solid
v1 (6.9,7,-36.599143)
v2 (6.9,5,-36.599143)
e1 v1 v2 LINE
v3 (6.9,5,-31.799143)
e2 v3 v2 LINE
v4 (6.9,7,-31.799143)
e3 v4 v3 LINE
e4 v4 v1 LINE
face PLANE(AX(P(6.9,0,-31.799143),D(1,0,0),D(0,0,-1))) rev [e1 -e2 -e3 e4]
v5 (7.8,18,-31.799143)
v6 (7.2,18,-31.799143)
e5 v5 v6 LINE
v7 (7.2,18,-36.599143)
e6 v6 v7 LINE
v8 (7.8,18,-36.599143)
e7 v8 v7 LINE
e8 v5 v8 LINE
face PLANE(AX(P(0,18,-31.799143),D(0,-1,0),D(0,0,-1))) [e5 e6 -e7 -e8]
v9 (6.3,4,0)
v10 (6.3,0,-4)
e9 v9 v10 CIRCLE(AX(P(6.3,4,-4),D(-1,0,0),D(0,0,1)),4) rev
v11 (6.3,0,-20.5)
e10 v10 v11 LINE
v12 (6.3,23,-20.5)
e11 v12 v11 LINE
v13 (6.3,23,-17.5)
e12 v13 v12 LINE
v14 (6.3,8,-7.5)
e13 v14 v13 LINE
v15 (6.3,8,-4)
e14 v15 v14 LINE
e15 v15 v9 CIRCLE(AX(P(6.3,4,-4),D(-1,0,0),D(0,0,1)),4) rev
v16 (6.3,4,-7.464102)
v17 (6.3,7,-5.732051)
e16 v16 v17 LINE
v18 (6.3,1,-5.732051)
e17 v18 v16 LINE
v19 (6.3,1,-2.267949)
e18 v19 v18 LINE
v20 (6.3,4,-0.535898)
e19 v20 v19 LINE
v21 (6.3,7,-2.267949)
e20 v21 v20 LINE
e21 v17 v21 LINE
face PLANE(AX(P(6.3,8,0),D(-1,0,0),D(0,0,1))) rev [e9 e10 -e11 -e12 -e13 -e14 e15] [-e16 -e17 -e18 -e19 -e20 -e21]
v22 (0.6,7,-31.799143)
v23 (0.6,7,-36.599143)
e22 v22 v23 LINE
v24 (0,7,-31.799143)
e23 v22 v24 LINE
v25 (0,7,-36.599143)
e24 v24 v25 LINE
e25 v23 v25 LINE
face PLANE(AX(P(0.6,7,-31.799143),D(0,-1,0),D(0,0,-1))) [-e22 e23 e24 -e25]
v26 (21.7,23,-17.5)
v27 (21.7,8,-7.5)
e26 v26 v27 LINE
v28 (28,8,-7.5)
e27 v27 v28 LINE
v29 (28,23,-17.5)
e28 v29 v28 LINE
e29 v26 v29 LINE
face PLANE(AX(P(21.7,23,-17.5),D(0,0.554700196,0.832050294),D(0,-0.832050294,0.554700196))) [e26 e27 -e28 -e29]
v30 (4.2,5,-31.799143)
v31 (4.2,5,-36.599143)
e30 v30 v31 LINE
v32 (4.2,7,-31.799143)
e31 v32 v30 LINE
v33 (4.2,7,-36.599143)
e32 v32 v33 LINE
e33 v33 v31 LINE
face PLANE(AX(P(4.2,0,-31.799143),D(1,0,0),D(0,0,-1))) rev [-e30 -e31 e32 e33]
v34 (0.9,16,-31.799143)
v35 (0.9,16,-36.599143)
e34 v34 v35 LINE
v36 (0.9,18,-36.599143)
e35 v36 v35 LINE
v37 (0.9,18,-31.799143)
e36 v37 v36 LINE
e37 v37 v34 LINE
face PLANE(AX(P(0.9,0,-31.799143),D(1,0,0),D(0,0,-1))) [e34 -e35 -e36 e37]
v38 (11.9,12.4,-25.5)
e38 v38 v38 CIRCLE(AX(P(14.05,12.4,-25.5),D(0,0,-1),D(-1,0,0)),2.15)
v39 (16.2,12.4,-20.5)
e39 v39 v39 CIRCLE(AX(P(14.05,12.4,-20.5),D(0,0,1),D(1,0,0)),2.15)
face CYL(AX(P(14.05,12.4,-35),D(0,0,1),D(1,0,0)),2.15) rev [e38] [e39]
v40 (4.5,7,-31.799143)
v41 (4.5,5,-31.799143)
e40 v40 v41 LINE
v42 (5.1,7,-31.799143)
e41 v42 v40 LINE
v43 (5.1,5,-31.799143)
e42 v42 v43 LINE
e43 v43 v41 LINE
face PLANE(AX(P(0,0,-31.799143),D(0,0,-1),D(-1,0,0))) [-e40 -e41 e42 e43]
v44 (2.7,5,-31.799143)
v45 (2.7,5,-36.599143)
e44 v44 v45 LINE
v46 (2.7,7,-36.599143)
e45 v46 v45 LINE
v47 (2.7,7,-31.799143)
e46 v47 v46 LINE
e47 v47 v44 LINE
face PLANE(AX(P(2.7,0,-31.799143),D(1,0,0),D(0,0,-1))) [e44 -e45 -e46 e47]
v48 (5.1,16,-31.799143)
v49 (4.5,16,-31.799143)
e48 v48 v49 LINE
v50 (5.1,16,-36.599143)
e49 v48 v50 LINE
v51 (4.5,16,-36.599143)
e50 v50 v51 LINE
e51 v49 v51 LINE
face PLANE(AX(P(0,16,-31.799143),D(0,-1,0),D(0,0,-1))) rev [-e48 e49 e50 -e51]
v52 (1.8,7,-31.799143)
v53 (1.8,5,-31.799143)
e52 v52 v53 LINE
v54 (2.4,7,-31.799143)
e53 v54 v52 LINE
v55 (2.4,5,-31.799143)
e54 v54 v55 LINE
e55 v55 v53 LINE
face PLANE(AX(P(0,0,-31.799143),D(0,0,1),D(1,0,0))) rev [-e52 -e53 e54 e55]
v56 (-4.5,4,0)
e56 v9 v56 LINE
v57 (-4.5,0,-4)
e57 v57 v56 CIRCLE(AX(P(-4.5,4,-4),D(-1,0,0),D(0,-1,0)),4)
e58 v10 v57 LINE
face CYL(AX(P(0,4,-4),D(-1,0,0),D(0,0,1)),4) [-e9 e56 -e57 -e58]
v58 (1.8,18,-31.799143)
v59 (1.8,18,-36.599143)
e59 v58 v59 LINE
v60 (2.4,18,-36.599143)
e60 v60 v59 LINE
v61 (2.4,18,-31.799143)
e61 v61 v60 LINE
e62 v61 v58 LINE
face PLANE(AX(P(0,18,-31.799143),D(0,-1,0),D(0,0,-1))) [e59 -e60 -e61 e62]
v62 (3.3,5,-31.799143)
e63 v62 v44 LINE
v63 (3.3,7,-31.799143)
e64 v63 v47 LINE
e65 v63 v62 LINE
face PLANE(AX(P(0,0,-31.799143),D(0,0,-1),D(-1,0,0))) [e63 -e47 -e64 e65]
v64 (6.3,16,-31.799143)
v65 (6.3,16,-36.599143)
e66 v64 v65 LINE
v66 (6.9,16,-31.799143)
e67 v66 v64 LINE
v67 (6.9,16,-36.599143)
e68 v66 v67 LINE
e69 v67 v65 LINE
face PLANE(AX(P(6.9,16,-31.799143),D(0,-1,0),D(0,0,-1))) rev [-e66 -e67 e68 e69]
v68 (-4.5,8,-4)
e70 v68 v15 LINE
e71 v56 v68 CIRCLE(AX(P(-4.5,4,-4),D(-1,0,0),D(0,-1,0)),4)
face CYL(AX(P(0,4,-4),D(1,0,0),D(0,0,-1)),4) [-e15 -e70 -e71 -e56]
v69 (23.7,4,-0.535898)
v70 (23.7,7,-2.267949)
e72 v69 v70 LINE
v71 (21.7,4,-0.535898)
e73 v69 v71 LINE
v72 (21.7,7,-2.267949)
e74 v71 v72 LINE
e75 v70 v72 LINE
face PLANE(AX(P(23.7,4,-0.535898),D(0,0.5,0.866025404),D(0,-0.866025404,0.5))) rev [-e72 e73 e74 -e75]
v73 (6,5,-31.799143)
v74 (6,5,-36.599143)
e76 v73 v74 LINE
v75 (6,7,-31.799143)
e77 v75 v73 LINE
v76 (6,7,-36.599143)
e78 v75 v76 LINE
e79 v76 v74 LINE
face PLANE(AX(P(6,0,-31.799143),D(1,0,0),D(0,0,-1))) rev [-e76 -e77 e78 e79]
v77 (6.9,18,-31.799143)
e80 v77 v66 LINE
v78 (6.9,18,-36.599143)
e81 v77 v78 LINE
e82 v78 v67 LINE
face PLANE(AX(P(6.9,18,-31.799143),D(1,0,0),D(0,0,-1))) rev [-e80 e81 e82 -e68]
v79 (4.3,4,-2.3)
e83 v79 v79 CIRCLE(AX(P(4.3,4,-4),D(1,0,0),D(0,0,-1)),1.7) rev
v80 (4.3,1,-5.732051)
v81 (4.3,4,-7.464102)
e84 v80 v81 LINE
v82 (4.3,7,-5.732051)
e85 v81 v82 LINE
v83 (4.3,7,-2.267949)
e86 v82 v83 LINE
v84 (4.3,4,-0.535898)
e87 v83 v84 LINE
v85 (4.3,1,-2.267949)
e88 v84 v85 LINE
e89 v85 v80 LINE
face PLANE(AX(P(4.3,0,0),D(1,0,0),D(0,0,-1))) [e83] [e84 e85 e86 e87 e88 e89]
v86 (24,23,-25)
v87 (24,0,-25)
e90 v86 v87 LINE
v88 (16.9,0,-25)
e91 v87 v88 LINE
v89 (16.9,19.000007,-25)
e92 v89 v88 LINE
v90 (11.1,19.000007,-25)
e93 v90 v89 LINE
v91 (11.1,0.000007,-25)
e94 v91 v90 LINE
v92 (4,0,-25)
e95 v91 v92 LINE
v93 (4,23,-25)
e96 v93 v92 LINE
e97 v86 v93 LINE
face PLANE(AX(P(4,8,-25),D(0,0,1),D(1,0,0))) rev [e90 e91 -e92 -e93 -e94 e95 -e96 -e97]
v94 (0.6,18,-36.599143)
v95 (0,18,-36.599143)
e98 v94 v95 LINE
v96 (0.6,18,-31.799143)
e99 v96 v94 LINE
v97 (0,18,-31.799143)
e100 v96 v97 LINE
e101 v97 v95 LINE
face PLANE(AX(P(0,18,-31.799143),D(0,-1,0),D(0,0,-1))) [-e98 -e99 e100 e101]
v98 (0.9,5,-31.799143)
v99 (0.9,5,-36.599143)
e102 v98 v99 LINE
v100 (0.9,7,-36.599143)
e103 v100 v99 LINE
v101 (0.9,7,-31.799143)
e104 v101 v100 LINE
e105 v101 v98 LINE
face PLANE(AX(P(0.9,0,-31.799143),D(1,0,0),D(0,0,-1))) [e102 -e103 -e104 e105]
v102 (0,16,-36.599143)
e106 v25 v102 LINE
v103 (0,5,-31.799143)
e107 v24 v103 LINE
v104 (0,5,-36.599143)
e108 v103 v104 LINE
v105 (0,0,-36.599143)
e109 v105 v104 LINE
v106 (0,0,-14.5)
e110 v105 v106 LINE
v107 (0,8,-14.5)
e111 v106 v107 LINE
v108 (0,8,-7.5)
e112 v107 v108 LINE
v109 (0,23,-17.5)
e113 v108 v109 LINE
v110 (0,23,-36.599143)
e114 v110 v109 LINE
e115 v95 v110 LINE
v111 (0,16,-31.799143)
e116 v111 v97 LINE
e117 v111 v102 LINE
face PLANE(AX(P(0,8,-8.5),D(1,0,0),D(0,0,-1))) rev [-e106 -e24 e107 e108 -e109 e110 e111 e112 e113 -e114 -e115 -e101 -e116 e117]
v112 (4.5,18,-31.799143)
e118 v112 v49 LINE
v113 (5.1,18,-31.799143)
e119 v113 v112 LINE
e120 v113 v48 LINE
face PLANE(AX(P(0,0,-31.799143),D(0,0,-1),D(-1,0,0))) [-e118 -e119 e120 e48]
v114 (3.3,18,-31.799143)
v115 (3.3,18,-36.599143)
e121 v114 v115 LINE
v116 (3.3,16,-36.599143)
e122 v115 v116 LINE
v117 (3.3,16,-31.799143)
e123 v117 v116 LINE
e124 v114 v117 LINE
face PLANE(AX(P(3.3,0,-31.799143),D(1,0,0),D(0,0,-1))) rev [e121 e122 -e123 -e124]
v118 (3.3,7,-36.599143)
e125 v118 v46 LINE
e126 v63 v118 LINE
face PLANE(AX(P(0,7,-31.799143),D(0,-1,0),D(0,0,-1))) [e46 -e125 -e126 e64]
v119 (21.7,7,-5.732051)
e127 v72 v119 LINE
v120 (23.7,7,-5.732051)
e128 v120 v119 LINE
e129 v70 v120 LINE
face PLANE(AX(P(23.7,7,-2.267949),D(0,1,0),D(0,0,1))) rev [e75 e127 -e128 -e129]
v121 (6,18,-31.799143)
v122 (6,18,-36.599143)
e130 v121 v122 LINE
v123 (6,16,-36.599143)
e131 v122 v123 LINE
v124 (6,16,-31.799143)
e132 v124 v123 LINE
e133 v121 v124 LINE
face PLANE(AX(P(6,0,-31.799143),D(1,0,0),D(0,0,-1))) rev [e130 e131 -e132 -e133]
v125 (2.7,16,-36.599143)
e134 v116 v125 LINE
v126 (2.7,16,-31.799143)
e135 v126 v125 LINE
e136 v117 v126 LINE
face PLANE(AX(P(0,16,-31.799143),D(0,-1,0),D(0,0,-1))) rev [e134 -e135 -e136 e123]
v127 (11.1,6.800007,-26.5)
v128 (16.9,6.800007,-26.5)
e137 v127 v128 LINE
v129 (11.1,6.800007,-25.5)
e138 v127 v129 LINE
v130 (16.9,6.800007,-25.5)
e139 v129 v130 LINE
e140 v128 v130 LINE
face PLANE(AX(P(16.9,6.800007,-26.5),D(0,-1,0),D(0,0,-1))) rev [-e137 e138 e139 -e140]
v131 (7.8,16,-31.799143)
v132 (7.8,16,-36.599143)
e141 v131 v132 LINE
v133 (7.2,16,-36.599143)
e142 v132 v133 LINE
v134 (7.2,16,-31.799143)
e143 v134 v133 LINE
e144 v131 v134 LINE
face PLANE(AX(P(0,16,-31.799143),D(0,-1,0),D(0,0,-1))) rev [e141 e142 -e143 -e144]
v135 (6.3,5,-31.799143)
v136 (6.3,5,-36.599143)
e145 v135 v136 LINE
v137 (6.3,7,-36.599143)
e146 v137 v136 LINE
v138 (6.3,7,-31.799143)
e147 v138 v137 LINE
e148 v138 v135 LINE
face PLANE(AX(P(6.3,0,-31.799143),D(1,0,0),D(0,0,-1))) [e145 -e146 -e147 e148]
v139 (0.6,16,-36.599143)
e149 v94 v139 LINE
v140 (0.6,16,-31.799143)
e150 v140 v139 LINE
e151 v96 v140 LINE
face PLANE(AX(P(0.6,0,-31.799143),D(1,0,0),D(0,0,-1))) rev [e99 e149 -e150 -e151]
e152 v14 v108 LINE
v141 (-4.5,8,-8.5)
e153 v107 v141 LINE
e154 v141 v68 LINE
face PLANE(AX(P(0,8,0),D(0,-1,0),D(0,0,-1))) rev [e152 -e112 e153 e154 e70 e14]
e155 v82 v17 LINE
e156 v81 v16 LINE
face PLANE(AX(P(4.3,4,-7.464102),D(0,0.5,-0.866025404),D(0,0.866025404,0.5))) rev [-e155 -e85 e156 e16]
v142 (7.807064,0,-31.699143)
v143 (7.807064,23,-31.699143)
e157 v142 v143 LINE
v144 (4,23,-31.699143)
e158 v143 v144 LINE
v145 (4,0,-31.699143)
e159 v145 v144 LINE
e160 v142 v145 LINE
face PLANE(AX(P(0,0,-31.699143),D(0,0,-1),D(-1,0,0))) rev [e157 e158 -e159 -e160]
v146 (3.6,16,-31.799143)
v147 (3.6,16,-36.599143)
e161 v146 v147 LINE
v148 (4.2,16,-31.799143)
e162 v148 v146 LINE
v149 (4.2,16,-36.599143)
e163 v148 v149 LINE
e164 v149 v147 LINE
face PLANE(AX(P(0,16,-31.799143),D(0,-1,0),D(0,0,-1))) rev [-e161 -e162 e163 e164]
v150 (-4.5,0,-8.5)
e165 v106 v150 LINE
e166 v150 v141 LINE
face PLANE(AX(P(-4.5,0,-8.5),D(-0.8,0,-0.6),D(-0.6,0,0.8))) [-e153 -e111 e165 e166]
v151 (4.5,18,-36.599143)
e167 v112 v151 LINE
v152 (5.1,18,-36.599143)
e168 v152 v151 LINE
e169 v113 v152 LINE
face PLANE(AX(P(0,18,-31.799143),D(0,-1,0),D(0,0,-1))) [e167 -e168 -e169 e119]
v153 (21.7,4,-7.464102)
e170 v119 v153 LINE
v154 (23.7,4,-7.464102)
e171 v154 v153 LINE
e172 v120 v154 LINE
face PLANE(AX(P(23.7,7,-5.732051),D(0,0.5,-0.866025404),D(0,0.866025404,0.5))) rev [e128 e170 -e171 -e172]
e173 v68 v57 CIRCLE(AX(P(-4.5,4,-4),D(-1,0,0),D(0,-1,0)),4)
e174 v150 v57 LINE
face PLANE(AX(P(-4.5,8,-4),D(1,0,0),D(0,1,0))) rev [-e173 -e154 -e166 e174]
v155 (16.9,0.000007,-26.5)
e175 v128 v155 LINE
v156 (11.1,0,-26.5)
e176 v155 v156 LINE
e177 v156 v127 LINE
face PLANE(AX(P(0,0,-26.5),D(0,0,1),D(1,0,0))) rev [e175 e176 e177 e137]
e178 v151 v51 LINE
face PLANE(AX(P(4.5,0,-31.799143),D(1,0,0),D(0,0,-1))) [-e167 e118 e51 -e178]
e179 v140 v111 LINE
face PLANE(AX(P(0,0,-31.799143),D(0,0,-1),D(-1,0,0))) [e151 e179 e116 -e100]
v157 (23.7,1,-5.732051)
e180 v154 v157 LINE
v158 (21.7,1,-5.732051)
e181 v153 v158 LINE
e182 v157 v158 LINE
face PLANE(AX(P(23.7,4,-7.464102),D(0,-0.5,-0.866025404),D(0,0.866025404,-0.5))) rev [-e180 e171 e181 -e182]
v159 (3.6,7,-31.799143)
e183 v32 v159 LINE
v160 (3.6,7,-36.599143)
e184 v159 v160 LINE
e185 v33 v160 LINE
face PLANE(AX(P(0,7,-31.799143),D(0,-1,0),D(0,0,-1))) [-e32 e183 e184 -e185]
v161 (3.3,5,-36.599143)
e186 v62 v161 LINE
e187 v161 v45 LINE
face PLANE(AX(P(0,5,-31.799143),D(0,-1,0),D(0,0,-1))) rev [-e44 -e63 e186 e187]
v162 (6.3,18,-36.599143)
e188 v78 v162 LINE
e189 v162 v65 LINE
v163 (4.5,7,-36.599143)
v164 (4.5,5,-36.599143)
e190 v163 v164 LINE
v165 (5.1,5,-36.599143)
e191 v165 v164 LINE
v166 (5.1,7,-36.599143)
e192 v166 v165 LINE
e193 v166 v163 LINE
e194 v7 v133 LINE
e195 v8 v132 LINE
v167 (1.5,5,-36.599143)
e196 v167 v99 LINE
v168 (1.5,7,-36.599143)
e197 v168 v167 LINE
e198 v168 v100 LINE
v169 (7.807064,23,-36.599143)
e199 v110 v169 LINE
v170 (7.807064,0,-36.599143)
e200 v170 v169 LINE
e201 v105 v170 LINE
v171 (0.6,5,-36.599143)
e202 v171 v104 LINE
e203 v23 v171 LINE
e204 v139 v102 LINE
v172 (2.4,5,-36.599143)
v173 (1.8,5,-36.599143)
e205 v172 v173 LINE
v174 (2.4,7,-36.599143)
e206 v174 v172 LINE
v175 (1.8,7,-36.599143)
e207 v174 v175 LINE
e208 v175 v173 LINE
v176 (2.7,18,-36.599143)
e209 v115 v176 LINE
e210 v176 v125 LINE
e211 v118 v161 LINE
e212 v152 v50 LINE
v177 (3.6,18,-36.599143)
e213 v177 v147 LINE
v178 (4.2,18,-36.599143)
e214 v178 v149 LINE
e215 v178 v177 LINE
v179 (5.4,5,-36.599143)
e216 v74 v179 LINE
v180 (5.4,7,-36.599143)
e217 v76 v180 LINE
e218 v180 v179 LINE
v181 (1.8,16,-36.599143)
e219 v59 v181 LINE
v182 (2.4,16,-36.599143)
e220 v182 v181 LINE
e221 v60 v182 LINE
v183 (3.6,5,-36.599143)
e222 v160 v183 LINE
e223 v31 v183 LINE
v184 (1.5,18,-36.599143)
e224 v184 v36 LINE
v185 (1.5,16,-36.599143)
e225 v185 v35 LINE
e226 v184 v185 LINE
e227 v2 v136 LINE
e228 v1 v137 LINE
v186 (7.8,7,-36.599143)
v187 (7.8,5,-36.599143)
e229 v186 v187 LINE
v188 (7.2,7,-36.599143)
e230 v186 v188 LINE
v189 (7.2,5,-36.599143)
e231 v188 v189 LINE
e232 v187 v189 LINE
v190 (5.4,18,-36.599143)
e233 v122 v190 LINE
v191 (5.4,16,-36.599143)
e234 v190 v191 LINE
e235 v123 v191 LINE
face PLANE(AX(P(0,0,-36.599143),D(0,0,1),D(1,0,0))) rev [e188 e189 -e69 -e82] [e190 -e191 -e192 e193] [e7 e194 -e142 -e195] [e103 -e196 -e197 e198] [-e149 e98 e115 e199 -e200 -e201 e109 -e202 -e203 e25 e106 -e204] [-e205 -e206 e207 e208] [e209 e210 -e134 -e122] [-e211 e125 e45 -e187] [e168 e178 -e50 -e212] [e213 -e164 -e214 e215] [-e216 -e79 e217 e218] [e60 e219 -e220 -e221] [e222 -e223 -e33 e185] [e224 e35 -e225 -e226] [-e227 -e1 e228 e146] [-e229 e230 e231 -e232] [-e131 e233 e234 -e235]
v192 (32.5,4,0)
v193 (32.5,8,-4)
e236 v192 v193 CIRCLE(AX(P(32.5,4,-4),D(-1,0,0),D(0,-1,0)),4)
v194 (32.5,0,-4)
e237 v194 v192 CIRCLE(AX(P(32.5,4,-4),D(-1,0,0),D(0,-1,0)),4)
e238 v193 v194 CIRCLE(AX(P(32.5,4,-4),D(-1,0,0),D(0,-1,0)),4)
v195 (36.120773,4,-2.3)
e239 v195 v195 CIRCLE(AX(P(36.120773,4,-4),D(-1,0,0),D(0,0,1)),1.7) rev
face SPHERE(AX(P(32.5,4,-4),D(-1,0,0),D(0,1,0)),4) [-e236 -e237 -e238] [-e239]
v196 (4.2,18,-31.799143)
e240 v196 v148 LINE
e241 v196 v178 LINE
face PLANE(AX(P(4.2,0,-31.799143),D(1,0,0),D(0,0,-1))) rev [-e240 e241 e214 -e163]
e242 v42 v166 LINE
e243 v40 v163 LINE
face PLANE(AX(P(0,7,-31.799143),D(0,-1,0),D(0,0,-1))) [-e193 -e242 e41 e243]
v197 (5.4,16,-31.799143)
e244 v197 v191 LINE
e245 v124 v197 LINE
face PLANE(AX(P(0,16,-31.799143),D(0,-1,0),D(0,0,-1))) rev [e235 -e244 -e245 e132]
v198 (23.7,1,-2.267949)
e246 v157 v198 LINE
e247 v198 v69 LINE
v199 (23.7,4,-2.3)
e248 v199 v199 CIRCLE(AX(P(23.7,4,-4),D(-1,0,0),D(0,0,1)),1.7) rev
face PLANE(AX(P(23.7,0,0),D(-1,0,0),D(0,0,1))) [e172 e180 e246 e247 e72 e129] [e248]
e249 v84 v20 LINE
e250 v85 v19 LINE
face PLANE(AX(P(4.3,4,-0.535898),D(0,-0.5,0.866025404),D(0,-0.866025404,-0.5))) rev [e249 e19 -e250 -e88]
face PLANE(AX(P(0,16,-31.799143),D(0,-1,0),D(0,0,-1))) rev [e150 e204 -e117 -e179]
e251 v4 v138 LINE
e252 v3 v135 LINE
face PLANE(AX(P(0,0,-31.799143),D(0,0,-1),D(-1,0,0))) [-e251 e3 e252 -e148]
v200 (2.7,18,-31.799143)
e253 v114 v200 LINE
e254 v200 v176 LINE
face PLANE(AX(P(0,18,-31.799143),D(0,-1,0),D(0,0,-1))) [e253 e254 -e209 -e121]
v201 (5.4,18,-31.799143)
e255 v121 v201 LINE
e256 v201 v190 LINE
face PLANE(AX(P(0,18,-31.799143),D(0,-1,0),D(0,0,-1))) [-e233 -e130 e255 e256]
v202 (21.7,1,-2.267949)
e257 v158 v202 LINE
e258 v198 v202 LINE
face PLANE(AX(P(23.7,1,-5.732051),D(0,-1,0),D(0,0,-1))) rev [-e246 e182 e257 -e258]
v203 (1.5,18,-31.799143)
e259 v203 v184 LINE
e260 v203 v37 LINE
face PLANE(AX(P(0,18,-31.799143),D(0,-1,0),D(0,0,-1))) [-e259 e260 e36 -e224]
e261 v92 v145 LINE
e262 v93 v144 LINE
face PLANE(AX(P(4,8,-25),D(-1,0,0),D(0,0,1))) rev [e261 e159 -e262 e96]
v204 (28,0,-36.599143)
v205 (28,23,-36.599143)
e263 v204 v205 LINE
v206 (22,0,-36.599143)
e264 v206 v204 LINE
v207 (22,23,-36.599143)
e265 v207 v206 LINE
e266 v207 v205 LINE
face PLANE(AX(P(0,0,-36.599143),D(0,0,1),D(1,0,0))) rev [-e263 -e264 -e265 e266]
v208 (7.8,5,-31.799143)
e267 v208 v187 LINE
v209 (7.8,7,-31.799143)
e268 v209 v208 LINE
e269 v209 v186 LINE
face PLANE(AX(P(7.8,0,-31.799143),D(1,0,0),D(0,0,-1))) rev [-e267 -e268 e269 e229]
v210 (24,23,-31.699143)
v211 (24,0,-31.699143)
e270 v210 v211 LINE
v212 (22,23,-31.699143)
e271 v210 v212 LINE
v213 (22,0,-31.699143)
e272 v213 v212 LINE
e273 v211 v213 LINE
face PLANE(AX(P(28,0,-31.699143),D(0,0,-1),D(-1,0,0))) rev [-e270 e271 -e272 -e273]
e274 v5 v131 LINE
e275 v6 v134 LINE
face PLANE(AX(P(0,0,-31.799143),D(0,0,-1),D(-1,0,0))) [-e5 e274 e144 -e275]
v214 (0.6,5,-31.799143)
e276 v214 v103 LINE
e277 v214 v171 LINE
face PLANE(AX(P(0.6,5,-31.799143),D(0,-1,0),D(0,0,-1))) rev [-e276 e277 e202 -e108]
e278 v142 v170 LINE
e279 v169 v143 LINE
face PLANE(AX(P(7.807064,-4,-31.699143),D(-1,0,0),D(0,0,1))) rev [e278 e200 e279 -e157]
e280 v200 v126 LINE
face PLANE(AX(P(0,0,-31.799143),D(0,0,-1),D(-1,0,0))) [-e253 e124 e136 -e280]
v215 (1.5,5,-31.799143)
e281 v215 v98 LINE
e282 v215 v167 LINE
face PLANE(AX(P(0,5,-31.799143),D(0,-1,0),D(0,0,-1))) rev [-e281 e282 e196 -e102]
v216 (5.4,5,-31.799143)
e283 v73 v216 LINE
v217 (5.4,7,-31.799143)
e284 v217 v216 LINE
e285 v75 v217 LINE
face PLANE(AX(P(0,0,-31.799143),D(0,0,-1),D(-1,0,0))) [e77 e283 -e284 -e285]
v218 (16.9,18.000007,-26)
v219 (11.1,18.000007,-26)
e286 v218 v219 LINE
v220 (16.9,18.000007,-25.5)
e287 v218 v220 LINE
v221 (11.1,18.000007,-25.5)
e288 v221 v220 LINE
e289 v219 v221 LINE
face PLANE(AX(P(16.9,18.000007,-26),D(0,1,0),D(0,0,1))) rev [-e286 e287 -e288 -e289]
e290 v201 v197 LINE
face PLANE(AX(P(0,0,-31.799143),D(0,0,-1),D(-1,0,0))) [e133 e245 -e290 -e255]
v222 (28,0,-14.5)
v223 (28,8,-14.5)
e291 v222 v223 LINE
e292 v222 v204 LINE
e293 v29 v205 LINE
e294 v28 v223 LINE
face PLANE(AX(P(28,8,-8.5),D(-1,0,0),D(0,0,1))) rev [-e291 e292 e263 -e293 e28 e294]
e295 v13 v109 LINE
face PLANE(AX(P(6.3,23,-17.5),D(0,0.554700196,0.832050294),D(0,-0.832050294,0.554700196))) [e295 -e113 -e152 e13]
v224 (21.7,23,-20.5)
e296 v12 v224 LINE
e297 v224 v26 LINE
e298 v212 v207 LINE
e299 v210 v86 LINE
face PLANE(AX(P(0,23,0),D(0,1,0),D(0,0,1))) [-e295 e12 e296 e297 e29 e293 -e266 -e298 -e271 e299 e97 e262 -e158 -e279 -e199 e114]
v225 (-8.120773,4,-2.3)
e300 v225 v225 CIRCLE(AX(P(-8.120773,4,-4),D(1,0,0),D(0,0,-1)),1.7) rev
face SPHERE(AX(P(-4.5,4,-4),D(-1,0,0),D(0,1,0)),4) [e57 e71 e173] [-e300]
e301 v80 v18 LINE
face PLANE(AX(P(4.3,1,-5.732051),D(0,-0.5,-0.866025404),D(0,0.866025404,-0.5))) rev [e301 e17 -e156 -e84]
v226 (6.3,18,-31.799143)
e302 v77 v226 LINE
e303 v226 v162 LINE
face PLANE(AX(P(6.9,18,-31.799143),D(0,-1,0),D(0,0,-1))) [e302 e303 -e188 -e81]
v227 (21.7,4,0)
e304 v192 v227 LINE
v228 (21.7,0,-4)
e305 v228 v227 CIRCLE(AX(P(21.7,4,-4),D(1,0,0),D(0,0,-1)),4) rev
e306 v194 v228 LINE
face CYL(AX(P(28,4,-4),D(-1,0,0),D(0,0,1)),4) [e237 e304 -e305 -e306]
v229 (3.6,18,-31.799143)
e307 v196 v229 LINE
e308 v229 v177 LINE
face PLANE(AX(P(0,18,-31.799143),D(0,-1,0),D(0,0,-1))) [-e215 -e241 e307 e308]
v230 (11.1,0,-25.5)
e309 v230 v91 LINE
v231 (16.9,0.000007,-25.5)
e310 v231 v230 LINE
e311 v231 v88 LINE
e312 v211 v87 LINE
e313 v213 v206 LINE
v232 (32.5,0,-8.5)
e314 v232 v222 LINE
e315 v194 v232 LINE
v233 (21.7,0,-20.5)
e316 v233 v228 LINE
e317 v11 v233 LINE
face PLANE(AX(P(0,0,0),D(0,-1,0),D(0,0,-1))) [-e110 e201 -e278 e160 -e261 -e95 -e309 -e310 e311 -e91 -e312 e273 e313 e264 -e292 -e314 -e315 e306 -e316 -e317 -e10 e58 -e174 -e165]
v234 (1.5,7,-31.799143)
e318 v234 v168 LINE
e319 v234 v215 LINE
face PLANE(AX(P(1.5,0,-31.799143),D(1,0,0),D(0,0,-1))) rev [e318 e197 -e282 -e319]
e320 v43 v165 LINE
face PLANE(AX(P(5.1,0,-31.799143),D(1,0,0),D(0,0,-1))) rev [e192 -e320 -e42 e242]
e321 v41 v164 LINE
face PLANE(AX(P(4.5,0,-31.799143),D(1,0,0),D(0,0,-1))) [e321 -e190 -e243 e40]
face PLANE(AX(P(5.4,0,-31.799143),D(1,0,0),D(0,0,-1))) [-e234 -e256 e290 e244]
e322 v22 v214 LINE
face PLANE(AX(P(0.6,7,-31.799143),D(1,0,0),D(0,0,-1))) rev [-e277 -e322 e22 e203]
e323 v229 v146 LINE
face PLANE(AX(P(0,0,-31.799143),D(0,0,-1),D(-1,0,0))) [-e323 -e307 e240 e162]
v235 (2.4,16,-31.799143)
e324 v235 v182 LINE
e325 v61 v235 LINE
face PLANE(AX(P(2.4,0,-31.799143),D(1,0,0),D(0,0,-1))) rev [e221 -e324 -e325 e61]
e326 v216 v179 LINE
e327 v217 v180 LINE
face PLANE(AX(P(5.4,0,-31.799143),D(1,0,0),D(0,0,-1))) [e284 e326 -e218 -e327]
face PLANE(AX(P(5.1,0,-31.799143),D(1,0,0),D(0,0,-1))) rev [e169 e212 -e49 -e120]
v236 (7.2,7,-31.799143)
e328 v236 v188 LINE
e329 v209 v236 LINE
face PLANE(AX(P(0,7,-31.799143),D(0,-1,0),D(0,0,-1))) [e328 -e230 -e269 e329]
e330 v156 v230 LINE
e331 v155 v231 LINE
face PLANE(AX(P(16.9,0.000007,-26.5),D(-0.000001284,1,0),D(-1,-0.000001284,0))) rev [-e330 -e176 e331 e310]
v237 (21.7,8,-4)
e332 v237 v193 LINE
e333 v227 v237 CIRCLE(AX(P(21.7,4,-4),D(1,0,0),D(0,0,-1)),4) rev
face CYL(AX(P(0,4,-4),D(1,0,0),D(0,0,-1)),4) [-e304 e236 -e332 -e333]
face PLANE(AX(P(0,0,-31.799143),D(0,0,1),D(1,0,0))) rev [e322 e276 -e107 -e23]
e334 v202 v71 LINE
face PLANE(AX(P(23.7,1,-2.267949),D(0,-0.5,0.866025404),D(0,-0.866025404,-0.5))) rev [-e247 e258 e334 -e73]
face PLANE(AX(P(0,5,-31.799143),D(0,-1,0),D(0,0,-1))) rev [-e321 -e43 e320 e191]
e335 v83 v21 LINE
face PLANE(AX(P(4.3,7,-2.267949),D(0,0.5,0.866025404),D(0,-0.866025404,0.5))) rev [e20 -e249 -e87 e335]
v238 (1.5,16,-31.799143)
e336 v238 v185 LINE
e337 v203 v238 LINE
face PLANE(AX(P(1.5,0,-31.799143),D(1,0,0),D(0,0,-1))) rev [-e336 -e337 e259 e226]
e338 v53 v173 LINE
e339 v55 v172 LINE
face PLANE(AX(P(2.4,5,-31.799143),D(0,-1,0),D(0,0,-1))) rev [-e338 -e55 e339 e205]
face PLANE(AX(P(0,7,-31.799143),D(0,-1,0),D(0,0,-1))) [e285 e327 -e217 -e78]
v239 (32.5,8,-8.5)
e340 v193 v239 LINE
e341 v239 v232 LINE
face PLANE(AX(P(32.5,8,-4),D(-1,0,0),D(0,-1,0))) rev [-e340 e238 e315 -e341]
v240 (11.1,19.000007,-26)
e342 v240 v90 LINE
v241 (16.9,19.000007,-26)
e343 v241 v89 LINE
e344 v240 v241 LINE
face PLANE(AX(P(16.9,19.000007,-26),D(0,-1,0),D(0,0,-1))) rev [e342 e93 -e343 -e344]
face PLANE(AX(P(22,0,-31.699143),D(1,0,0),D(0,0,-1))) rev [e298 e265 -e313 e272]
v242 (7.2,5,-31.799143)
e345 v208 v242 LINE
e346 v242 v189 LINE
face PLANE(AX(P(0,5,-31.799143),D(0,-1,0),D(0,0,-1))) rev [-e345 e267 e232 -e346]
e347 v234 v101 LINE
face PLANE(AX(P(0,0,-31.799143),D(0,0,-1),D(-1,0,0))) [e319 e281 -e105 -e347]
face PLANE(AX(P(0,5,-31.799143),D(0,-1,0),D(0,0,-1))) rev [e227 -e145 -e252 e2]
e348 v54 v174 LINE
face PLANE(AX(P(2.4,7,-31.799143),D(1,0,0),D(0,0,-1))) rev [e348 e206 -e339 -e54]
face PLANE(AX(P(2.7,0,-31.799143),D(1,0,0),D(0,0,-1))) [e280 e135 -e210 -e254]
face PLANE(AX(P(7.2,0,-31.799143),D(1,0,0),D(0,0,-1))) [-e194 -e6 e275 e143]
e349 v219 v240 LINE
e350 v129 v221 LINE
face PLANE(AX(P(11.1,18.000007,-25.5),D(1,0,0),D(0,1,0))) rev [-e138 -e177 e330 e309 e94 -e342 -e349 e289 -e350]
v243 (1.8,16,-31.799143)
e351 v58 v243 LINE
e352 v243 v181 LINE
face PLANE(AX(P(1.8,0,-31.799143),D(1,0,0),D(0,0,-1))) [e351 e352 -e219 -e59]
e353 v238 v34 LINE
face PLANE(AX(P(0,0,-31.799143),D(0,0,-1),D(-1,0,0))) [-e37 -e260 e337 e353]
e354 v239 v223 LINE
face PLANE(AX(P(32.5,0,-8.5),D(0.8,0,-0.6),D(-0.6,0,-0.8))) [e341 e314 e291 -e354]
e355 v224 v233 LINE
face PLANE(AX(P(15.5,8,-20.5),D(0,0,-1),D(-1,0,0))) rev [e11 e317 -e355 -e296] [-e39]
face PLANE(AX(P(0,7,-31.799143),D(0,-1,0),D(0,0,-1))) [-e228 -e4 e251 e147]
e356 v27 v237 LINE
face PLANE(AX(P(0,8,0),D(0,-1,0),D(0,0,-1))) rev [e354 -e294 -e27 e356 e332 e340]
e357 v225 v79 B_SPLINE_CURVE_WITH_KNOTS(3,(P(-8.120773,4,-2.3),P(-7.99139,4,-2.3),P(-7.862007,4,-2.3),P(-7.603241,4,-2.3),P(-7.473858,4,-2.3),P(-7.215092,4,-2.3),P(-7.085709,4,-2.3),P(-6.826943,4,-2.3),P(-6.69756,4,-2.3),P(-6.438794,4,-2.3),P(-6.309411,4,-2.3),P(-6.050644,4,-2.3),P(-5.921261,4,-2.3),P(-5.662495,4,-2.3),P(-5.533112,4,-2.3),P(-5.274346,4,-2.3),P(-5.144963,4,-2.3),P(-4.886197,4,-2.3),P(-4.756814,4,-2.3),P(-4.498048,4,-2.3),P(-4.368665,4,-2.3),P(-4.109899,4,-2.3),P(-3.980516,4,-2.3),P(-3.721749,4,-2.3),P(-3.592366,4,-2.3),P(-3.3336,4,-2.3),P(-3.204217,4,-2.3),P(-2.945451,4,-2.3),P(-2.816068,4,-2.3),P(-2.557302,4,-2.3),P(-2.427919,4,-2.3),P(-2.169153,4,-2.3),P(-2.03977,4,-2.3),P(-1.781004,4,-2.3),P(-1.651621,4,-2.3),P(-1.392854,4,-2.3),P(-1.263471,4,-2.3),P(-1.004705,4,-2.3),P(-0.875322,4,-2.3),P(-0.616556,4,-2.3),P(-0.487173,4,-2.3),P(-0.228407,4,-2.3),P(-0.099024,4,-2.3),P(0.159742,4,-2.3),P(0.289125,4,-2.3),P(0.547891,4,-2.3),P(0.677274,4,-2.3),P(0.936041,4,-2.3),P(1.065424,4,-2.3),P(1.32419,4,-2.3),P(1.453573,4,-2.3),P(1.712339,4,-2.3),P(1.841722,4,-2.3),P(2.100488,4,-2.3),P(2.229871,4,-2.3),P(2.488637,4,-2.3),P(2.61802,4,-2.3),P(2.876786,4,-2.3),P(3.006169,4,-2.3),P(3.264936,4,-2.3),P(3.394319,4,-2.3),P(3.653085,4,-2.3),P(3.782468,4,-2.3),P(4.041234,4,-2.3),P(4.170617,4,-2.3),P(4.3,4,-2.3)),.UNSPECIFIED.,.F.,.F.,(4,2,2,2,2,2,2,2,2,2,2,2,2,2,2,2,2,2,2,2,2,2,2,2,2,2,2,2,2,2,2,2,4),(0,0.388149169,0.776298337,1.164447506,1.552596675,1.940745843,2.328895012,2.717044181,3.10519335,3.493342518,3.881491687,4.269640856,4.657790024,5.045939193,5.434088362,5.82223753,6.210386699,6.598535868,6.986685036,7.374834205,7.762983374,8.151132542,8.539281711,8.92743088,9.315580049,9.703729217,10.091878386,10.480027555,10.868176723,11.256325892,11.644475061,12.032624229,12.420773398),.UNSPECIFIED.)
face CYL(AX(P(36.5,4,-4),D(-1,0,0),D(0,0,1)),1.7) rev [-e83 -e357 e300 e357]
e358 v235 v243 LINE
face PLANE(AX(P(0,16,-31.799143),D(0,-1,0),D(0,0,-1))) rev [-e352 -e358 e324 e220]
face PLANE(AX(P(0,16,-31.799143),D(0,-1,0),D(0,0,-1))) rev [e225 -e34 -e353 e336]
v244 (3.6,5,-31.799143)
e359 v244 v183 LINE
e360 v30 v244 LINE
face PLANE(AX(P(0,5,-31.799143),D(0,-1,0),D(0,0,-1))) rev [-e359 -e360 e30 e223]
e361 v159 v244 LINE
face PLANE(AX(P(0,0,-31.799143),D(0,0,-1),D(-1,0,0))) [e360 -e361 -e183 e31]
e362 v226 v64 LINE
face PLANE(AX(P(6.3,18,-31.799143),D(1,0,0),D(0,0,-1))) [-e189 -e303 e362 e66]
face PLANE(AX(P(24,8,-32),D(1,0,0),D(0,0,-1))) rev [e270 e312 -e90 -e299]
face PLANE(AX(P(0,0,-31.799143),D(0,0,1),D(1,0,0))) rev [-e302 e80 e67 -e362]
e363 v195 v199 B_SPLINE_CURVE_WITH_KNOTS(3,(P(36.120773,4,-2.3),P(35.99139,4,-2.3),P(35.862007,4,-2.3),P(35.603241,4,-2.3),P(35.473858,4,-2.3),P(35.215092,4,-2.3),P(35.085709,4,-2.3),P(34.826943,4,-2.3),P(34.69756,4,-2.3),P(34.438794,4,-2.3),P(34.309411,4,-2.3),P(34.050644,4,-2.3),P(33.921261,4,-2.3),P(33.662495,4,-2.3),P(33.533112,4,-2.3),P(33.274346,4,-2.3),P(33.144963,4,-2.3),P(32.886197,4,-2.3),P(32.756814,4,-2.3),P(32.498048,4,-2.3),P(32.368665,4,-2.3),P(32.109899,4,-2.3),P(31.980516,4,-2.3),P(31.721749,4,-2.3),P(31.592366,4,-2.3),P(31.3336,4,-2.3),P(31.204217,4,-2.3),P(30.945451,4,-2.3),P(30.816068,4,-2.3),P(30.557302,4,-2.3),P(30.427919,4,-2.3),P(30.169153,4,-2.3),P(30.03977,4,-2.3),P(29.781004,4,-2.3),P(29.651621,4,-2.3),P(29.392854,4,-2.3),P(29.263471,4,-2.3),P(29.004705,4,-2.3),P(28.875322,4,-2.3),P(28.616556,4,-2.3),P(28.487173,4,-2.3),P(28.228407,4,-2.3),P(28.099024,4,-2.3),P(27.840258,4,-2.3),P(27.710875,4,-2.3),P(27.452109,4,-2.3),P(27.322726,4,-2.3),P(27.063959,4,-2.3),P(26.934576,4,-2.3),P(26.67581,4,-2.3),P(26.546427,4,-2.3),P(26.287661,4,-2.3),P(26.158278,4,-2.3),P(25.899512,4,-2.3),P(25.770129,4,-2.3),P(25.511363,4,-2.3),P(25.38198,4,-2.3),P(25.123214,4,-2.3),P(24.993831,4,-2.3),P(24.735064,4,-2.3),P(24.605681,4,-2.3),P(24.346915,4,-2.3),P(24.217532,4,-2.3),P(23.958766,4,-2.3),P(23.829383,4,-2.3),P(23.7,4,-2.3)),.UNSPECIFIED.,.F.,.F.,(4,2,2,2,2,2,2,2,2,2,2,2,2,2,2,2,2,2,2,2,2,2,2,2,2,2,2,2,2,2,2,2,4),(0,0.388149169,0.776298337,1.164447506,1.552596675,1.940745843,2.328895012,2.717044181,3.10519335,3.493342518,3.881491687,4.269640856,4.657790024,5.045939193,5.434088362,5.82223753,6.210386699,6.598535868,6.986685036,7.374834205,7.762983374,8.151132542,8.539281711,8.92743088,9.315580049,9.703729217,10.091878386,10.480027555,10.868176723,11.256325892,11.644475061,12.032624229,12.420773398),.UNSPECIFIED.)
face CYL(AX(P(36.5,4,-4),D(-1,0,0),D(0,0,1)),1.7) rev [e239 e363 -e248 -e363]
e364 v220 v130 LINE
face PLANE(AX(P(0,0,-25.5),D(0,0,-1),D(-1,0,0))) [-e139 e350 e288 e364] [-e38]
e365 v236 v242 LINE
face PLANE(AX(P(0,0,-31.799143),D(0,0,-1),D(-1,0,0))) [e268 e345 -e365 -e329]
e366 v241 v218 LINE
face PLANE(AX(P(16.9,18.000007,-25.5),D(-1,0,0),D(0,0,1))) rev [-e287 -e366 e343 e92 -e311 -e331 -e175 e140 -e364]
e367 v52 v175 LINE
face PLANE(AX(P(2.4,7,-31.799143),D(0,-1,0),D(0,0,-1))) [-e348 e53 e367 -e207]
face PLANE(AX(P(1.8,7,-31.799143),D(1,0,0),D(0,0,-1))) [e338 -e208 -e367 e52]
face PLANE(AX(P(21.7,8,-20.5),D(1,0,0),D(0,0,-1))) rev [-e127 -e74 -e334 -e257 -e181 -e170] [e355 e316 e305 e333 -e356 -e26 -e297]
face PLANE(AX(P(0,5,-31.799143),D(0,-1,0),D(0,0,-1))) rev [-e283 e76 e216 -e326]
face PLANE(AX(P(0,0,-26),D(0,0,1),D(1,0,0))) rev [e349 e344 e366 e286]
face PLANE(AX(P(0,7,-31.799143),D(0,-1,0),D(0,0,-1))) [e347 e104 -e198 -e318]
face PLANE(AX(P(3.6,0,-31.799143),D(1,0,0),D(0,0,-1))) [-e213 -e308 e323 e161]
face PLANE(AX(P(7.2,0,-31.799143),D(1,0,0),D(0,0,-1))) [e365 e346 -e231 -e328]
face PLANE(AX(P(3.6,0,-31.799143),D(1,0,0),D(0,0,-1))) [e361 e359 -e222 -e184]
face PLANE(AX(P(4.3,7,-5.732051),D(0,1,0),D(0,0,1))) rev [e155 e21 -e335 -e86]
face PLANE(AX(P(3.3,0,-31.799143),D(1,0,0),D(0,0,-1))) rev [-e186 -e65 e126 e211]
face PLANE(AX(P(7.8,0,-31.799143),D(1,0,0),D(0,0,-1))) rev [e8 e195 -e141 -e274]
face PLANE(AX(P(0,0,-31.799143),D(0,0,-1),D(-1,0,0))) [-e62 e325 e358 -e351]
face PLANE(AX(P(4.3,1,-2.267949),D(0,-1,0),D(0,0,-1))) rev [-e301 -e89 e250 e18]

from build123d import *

# Parameters (mm, degrees)
BOSS_EXTRUDE1_DEPTH      = 8
BOSS_EXTRUDE2_DEPTH      = 15
BOSS_EXTRUDE4_DEPTH      = 6.3
BOSS_EXTRUDE5_DEPTH      = 6.3
SKETCH7_R                = 1.7
ENL_V_MAT_EXTRU_14_DEPTH = 62.473571557
SKETCH8_W                = 5.8
SKETCH8_H                = 18
BOSS_EXTRU_3_DEPTH       = 0.5
ESQUISSE5_R              = 2.15
ENL_V_MAT_EXTRU_5_DEPTH  = 48.765049984
ESQUISSE9_W              = 28
ESQUISSE9_H              = 5.300857061
ENL_V_MAT_EXTRU_9_DEPTH  = 56.554027757
BOSS_EXTRU_4_DEPTH       = 1
ESQUISSE11_W             = 5.8
ESQUISSE11_H             = 1
BOSS_EXTRU_5_DEPTH       = 1
ESQUISSE14_W             = 6
ESQUISSE14_H             = 5.9
ESQUISSE14_W_2           = 9
BOSS_EXTRU_7_DEPTH       = 23
ESQUISSE15_W             = 0.6
ESQUISSE15_H             = 2
ENL_V_MAT_EXTRU_12_DEPTH = 5.8
ESQUISSE17_W             = 1.2
ESQUISSE17_H             = 5.9
ENL_V_MAT_EXTRU_13_DEPTH = 27
ESQUISSE16_W             = 28
ESQUISSE16_H             = 1
ENL_V_MAT_EXTRU_11_DEPTH = 23
CONG_3_R                 = 4
ENL_V_MAT_EXTRU_15_DEPTH = 2
ENL_V_MAT_EXTRU_16_DEPTH = 2
BOSS_EXTRU_8_DEPTH       = 8


with BuildPart() as part:
    # Sketch1 → Boss-Extrude1 (new body)
    with BuildSketch(Plane(origin=(0, 0, 0), x_dir=(1, 0, 0), z_dir=(0, 1, 0))):
        Polygon((6.3, 0), (6.3, 20.5), (12.5, 20.5), (15.5, 20.5), (21.7, 20.5), (21.7, 0), (28, 0), (36.5, 0), (36.5, 8.5), (28, 8.5), (28, 35), (22, 35), (22, 32), (24, 32), (24, 25), (4, 25), (4, 32), (8, 32), (8, 35), (0, 35), (0, 8.5), (-8.5, 8.5), (-8.5, 0), (0, 0), align=None)
    extrude(amount=BOSS_EXTRUDE1_DEPTH)

    # Sketch2 → Boss-Extrude2 (add)
    with BuildSketch(Plane(origin=(0, 8, 0), x_dir=(1, 0, 0), z_dir=(0, 1, 0))):
        Polygon((8, 35), (8, 32), (4, 32), (4, 25), (24, 25), (24, 32), (22, 32), (22, 35), (28, 35), (28, 20.5), (0, 20.5), (0, 35), align=None)
    extrude(amount=BOSS_EXTRUDE2_DEPTH)

    # Sketch4 → Boss-Extrude4 (add)
    with BuildSketch(Plane.ZY):
        Polygon((-17.5, 23), (-20.5, 23), (-20.5, 8), (-7.5, 8), align=None)
    extrude(amount=-BOSS_EXTRUDE4_DEPTH)

    # Sketch5 → Boss-Extrude5 (add)
    with BuildSketch(Plane(origin=(28, 0, 0), x_dir=(0, 0, -1), z_dir=(1, 0, 0))):
        Polygon((20.5, 8), (7.5, 8), (17.5, 23), (20.5, 23), align=None)
    extrude(amount=-BOSS_EXTRUDE5_DEPTH)

    # Sketch7 → Enlèv. mat.-Extru.14 (cut, through all)
    with BuildSketch(Plane.ZY.offset(8.5)):
        with Locations((-4, 4)):
            Circle(SKETCH7_R)
    extrude(amount=-ENL_V_MAT_EXTRU_14_DEPTH, mode=Mode.SUBTRACT)

    # Sketch8 → Boss.-Extru.3 (add)
    with BuildSketch(Plane(origin=(0, 0, -25), x_dir=(-1, 0, 0), z_dir=(0, 0, -1))):
        with Locations((-14, 9.000007445)):
            Rectangle(SKETCH8_W, SKETCH8_H)
    extrude(amount=BOSS_EXTRU_3_DEPTH)

    # Esquisse5 → Enlèv. mat.-Extru.5 (cut, through all)
    with BuildSketch(Plane.XY.offset(-20.5)):
        with Locations((14.05, 12.4)):
            Circle(ESQUISSE5_R)
    extrude(amount=-ENL_V_MAT_EXTRU_5_DEPTH, mode=Mode.SUBTRACT)

    # Esquisse9 → Enlèv. mat.-Extru.9 (cut, through all)
    with BuildSketch(Plane(origin=(0, 23, 0), x_dir=(1, 0, 0), z_dir=(0, 1, 0))):
        with Locations((14, 34.349571469)):
            Rectangle(ESQUISSE9_W, ESQUISSE9_H)
    extrude(amount=-ENL_V_MAT_EXTRU_9_DEPTH, mode=Mode.SUBTRACT)

    # Esquisse10 → Boss.-Extru.4 (add)
    with BuildSketch(Plane(origin=(0, 0, -25.5), x_dir=(-1, 0, 0), z_dir=(0, 0, -1))):
        Polygon((-16.9, 7.445e-06), (-11.1, 0), (-11.1, 6.800007445), (-16.9, 6.800007445), align=None)
    extrude(amount=BOSS_EXTRU_4_DEPTH)

    # Esquisse11 → Boss.-Extru.5 (add)
    with BuildSketch(Plane(origin=(0, 0, -25), x_dir=(-1, 0, 0), z_dir=(0, 0, -1))):
        with Locations((-14, 18.500007445)):
            Rectangle(ESQUISSE11_W, ESQUISSE11_H)
    extrude(amount=BOSS_EXTRU_5_DEPTH)

    # Esquisse14 → Boss.-Extru.7 (add)
    with BuildSketch(Plane(origin=(0, 23, -10.399142939), x_dir=(-1, 0, 0), z_dir=(0, -1, 0))):
        with Locations((-25, 24.25)):
            Rectangle(ESQUISSE14_W, ESQUISSE14_H)
        with Locations((-4.5, 24.25)):
            Rectangle(ESQUISSE14_W_2, ESQUISSE14_H)
    extrude(amount=BOSS_EXTRU_7_DEPTH)

    # Esquisse15 → Enlèv. mat.-Extru.12 (cut)
    with BuildSketch(Plane(origin=(0, 0, -37.599142939), x_dir=(-1, 0, 0), z_dir=(0, 0, -1))):
        with Locations((-7.5, 17)):
            Rectangle(ESQUISSE15_W, ESQUISSE15_H)
        with Locations((-6.6, 17)):
            Rectangle(ESQUISSE15_W, ESQUISSE15_H)
        with Locations((-5.7, 17)):
            Rectangle(ESQUISSE15_W, ESQUISSE15_H)
        with Locations((-8.4, 17)):
            Rectangle(ESQUISSE15_W, ESQUISSE15_H)
        with Locations((-8.4, 6)):
            Rectangle(ESQUISSE15_W, ESQUISSE15_H)
        with Locations((-0.3, 6)):
            Rectangle(ESQUISSE15_W, ESQUISSE15_H)
        with Locations((-0.3, 17)):
            Rectangle(ESQUISSE15_W, ESQUISSE15_H)
        with Locations((-4.8, 17)):
            Rectangle(ESQUISSE15_W, ESQUISSE15_H)
        with Locations((-3.9, 17)):
            Rectangle(ESQUISSE15_W, ESQUISSE15_H)
        with Locations((-7.5, 6)):
            Rectangle(ESQUISSE15_W, ESQUISSE15_H)
        with Locations((-3, 17)):
            Rectangle(ESQUISSE15_W, ESQUISSE15_H)
        with Locations((-2.1, 17)):
            Rectangle(ESQUISSE15_W, ESQUISSE15_H)
        with Locations((-6.6, 6)):
            Rectangle(ESQUISSE15_W, ESQUISSE15_H)
        with Locations((-1.2, 17)):
            Rectangle(ESQUISSE15_W, ESQUISSE15_H)
        with Locations((-5.7, 6)):
            Rectangle(ESQUISSE15_W, ESQUISSE15_H)
        with Locations((-4.8, 6)):
            Rectangle(ESQUISSE15_W, ESQUISSE15_H)
        with Locations((-3.9, 6)):
            Rectangle(ESQUISSE15_W, ESQUISSE15_H)
        with Locations((-3, 6)):
            Rectangle(ESQUISSE15_W, ESQUISSE15_H)
        with Locations((-2.1, 6)):
            Rectangle(ESQUISSE15_W, ESQUISSE15_H)
        with Locations((-1.2, 6)):
            Rectangle(ESQUISSE15_W, ESQUISSE15_H)
    extrude(amount=-ENL_V_MAT_EXTRU_12_DEPTH, mode=Mode.SUBTRACT)

    # Esquisse17 → Enlèv. mat.-Extru.13 (cut)
    with BuildSketch(Plane(origin=(0, 23, 0), x_dir=(1, 0, 0), z_dir=(0, 1, 0))):
        with Locations((8.407063975, 34.649142939)):
            Rectangle(ESQUISSE17_W, ESQUISSE17_H)
    extrude(amount=-ENL_V_MAT_EXTRU_13_DEPTH, mode=Mode.SUBTRACT)

    # Esquisse16 → Enlèv. mat.-Extru.11 (cut)
    with BuildSketch(Plane(origin=(0, 23, 0), x_dir=(1, 0, 0), z_dir=(0, 1, 0))):
        with Locations((14, 37.099142939)):
            Rectangle(ESQUISSE16_W, ESQUISSE16_H)
    extrude(amount=-ENL_V_MAT_EXTRU_11_DEPTH, mode=Mode.SUBTRACT)

    # Esquisse23 → Enlèvement de matière-Révolution11 (revolve, cut)
    with BuildSketch(Plane(origin=(0, 0, -4), x_dir=(-1, 0, 0), z_dir=(0, 0, -1)), mode=Mode.PRIVATE) as enl_vement_de_mati_re_r_volution11_sk:
        with BuildLine():
            Line((-32.5, 8), (-32.5, 11.823143252))
            Line((-32.5, 11.823143252), (-33.950094463, 11.823143252))
            Line((-33.950094463, 11.823143252), (-37.601757894, 11.944869061))
            Line((-37.601757894, 11.944869061), (-40.320792242, 4))
            Line((-40.320792242, 4), (-36.5, 4))
            ThreePointArc((-36.5, 4), (-35.328427125, 6.828427125), (-32.5, 8))
        make_face()
        with BuildLine():
            Line((8.5, 4), (12.320792242, 4))
            Line((12.320792242, 4), (9.601757894, 11.944869061))
            Line((9.601757894, 11.944869061), (5.950094463, 11.823143252))
            Line((5.950094463, 11.823143252), (4.5, 11.823143252))
            Line((4.5, 11.823143252), (4.5, 8))
            ThreePointArc((4.5, 8), (7.328427125, 6.828427125), (8.5, 4))
        make_face()
    revolve(enl_vement_de_mati_re_r_volution11_sk.sketch.rotate(Axis((36.5, 4, -4), (1, 0, 0)), 90), axis=Axis((36.5, 4, -4), (1, 0, 0)), mode=Mode.SUBTRACT)

    # Congé3
    cong_3_edges = [part.edges().sort_by_distance(p)[0] for p in [
        (27.1, 0, 0),
        (27.1, 8, 0),
        (0.9, 0, 0),
        (0.9, 8, 0),
    ]]
    fillet(cong_3_edges, radius=CONG_3_R - 0.0001)  # a hair under: the kernel refuses the full size

    # Esquisse26 → Enlèv. mat.-Extru.15 (cut)
    with BuildSketch(Plane.ZY.offset(-21.7)):
        Polygon((-0.535898385, 4), (-2.267949192, 7), (-5.732050808, 7), (-7.464101615, 4), (-5.732050808, 1), (-2.267949192, 1), align=None)
    extrude(amount=-ENL_V_MAT_EXTRU_15_DEPTH, mode=Mode.SUBTRACT)

    # Esquisse27 → Enlèv. mat.-Extru.16 (cut)
    with BuildSketch(Plane(origin=(6.3, 0, 0), x_dir=(0, 0, -1), z_dir=(1, 0, 0))):
        Polygon((7.464101615, 4), (5.732050808, 7), (2.267949192, 7), (0.535898385, 4), (2.267949192, 1), (5.732050808, 1), align=None)
    extrude(amount=-ENL_V_MAT_EXTRU_16_DEPTH, mode=Mode.SUBTRACT)

    # Esquisse28 → Boss.-Extru.8 (add)
    with BuildSketch(Plane(origin=(0, 8, 0), x_dir=(1, 0, 0), z_dir=(0, 1, 0))):
        Polygon((28, 8.5), (32.5, 8.5), (28, 14.5), align=None)
        Polygon((-4.5, 8.5), (0, 14.5), (0, 8.5), align=None)
    extrude(amount=-BOSS_EXTRU_8_DEPTH)


solid = part.part
